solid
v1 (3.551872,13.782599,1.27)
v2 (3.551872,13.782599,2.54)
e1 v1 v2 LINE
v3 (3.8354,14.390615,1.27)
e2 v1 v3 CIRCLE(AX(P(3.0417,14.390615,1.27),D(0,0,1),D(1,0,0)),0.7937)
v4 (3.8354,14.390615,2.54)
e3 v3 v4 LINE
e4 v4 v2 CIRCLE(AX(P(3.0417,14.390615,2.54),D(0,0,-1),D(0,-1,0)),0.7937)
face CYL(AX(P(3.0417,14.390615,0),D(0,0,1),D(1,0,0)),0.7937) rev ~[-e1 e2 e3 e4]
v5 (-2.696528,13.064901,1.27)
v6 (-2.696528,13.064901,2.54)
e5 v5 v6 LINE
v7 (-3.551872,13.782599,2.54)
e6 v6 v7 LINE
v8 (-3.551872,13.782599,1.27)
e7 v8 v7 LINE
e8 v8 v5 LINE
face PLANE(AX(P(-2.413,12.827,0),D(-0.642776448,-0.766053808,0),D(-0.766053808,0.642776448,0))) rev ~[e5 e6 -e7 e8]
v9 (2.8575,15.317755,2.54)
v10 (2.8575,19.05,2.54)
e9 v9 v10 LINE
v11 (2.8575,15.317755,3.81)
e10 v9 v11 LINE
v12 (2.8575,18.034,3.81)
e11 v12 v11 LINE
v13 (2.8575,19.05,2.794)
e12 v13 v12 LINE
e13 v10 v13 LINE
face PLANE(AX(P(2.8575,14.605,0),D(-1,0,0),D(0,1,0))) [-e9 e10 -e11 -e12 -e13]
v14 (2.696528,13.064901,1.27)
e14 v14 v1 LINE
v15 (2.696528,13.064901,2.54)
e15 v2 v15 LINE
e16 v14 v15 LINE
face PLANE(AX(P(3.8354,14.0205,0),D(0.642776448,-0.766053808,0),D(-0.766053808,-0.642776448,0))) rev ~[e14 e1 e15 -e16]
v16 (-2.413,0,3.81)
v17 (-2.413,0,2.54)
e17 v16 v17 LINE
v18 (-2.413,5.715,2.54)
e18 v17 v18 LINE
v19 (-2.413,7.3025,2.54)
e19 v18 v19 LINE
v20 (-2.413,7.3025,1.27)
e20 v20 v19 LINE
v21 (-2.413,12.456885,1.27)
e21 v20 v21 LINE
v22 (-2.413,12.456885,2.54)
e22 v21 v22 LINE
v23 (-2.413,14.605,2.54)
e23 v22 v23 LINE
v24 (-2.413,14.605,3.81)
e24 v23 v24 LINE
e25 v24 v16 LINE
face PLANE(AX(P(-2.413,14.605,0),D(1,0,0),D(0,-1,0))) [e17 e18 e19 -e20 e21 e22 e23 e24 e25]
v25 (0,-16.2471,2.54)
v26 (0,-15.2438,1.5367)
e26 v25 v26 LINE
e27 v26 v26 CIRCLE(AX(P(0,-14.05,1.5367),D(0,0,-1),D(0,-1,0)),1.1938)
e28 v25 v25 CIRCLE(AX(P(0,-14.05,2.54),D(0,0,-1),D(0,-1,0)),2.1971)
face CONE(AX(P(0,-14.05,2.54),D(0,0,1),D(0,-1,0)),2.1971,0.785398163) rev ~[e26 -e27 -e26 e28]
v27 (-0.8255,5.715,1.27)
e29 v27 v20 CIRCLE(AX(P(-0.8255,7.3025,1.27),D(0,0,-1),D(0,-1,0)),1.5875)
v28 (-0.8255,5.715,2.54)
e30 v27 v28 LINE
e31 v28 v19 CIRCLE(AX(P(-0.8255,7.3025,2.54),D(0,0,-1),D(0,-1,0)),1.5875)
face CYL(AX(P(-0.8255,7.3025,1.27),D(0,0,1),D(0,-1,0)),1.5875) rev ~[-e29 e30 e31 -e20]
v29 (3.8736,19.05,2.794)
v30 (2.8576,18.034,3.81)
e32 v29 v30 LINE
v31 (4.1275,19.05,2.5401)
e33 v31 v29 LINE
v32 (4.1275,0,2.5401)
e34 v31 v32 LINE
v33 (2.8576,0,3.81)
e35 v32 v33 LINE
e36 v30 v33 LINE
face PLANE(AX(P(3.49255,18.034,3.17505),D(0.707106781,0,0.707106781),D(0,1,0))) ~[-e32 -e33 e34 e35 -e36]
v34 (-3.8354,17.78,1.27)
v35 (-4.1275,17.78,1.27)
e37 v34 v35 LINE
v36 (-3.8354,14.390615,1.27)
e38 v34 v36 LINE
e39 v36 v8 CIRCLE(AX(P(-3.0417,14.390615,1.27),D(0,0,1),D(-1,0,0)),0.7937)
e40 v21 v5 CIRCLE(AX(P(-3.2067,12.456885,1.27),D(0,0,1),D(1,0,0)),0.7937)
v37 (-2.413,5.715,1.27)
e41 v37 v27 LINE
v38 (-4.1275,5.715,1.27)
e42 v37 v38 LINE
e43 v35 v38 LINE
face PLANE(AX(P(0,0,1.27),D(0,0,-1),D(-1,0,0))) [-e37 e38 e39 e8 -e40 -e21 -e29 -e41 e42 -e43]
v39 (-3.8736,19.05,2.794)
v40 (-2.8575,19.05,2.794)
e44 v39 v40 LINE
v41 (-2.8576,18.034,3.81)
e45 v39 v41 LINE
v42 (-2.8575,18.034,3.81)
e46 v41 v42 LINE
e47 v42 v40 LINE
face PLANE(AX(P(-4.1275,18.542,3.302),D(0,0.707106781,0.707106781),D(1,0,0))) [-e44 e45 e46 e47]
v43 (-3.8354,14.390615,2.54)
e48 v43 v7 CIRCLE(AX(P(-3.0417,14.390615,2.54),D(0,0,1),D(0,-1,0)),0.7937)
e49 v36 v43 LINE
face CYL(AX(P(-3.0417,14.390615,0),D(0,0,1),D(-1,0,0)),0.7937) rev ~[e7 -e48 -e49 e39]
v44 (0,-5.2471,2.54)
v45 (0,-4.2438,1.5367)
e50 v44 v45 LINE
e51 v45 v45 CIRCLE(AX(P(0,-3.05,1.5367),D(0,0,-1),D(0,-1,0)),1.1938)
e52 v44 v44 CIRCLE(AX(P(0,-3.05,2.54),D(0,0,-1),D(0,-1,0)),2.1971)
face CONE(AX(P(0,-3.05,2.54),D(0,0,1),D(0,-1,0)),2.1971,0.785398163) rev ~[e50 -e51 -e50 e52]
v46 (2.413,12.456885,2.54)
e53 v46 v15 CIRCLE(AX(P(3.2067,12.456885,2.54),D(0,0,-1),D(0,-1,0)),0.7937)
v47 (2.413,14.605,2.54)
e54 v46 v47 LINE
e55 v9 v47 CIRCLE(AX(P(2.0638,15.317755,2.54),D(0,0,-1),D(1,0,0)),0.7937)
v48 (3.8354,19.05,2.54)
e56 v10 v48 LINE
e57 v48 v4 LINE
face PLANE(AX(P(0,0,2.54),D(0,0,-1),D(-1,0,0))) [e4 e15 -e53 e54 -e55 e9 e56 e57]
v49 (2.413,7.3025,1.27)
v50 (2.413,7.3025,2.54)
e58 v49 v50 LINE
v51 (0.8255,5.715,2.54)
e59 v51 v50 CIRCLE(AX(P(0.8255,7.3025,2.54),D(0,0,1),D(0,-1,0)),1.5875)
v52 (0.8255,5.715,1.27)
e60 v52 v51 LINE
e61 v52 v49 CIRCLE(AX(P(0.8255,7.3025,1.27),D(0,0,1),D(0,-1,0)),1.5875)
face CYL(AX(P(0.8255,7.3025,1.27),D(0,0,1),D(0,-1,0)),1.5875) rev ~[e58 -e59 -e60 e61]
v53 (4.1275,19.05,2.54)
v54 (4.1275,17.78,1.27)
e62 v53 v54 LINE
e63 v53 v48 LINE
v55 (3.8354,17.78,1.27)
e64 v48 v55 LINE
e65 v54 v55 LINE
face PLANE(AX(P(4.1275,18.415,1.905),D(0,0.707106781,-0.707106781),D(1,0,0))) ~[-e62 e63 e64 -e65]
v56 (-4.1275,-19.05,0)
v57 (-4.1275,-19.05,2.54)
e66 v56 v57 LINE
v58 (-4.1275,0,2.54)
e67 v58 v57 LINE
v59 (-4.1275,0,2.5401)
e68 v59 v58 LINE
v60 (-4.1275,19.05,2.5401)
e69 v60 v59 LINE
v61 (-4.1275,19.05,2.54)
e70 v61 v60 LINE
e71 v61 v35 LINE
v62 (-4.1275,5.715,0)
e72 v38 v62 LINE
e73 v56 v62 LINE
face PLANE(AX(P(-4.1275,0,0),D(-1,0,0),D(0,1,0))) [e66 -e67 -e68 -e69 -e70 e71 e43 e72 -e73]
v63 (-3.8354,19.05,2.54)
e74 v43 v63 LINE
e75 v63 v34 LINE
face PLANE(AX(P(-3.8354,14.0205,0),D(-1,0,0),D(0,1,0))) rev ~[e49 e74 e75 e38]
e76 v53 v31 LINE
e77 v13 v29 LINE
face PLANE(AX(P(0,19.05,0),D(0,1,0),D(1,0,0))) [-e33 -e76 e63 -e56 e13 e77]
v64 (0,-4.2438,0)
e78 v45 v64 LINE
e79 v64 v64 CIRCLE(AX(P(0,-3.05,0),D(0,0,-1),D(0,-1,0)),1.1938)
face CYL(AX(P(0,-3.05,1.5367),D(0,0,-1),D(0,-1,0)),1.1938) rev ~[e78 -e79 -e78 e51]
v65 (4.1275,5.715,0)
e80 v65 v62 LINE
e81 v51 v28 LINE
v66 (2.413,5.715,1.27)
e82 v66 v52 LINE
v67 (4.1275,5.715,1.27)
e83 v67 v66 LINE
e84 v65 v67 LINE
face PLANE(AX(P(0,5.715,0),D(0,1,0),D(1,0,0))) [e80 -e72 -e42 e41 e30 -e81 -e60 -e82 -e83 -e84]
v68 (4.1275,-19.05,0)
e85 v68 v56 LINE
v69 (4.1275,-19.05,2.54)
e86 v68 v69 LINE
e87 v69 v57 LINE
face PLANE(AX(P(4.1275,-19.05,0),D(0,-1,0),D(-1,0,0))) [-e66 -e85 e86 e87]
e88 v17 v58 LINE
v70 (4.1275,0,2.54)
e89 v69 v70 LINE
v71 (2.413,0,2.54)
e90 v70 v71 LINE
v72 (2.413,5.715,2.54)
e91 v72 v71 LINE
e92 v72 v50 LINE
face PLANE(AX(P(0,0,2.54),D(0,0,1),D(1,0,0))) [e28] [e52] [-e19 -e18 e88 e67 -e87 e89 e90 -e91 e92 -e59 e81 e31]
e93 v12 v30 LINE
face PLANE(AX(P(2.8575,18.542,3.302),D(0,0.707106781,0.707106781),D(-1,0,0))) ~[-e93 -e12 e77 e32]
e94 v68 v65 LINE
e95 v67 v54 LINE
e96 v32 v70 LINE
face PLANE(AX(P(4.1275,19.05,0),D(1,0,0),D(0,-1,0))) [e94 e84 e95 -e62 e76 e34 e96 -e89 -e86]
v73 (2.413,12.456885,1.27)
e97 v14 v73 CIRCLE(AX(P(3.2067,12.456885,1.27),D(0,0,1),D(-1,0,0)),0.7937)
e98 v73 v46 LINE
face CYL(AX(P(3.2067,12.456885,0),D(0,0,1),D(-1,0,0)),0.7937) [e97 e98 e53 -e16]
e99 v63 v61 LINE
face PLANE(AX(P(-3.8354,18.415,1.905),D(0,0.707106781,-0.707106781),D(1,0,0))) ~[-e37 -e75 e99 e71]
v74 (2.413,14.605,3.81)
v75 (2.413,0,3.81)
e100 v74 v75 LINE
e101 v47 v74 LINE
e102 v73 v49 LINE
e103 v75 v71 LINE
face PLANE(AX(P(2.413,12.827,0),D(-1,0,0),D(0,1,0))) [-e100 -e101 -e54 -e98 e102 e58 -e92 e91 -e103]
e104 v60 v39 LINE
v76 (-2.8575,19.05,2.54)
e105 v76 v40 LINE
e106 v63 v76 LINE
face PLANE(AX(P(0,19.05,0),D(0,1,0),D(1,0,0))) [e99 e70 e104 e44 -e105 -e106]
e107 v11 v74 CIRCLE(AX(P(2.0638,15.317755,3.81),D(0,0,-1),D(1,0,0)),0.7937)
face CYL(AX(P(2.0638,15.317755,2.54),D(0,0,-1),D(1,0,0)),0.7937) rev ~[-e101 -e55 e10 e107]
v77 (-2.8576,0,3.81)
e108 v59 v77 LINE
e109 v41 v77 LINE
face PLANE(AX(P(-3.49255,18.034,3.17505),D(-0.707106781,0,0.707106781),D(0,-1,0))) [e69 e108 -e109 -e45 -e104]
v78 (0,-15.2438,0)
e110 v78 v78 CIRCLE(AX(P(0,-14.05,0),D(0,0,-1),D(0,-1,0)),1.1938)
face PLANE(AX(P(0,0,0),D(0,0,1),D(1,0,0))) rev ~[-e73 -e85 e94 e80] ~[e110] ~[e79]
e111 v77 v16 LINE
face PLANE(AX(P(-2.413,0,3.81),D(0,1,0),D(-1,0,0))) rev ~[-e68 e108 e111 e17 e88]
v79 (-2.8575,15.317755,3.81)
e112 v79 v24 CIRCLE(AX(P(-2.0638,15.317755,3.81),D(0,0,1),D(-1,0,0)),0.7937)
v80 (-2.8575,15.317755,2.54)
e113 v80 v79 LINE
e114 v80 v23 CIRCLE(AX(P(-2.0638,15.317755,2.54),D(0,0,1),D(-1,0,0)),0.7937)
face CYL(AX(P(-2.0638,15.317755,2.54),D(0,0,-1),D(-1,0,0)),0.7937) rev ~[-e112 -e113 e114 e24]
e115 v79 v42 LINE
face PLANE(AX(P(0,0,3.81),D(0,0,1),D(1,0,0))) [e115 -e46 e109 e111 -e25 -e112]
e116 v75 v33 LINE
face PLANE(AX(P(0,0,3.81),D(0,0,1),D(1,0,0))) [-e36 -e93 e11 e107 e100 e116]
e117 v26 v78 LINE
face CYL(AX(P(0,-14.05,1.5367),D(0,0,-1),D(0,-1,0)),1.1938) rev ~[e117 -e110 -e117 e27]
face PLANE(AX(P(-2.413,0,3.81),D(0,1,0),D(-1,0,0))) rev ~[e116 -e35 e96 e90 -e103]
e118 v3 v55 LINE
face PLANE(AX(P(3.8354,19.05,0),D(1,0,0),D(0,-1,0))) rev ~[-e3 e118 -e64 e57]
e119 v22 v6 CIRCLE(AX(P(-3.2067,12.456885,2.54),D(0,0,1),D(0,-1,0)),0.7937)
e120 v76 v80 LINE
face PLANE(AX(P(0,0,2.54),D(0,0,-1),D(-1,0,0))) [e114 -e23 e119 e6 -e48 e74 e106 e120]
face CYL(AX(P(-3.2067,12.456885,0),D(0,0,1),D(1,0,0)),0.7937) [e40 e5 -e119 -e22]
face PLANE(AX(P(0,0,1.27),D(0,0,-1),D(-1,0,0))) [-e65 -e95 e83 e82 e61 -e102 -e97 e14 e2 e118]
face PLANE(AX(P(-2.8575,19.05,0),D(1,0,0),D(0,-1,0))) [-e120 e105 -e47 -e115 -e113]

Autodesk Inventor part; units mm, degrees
ref_plane "YZ Plane" through (0, 0, 0) normal (1, 0, 0) x (0, 1, 0)
ref_plane "XZ Plane" through (0, 0, 0) normal (0, 1, 0) x (-1, 0, 0)
ref_plane "XY Plane" through (0, 0, 0) normal (0, 0, 1) x (1, 0, 0)
sketch "Sketch1" plane through (0, 0, 0) normal (0, 0, 1) x (1, 0, 0)
  line L0 (0, 26.67) -> (0, -26.67) projected
  line L1 (-5.7785, 0) -> (5.7785, 0) projected
  line L2 (4.1275, -19.05) -> (-4.1275, -19.05)
  line L3 (-4.1275, -19.05) -> (-4.1275, 19.05)
  line L4 (-4.1275, 19.05) -> (4.1275, 19.05)
  line L5 (4.1275, 19.05) -> (4.1275, -19.05)
  line L6 (4.1275, -19.05) -> (-4.1275, 19.05) construction
  line L7 (-4.1275, -19.05) -> (4.1275, 19.05) construction
  point P0 (0, 0)
  point P1 (0, -14.05)
  point P2 (0, -3.05)
  dimension "d0" = 38.1
  dimension "d1" = 8.255
  dimension "d2" = 5
  dimension "d3" = 11
extrude "Extrusion1" add sketch "Sketch1" along normal blind 3.81
sketch "Sketch5" plane through (0, 0, 3.81) normal (0, 0, 1) x (1, 0, 0)
  point P0 (0, 0)
  point P1 (0, -3.05)
  point P2 (0, -14.05)
hole "Hole2" at (0, -3.05, 3.81) at (0, -14.05, 3.81) direction (0, 0, -1) diameter 1.27 end through all
sketch "Sketch2" plane through (0, 0, 0) normal (0, 0, -1) x (-1, 0, 0)
  line L0 (4.1275, 19.05) -> (-4.1275, 19.05) projected
  line L1 (-3.8354, 19.05) -> (-3.8354, 14.0205)
  line L2 (-3.8354, 14.0205) -> (-2.413, 12.827)
  line L3 (-2.413, 12.827) -> (2.413, 12.827)
  line L4 (2.413, 12.827) -> (3.8354, 14.0205)
  line L5 (3.8354, 14.0205) -> (3.8354, 19.05)
  line L6 (0, -26.67) -> (0, 26.67) projected
  line L7 (-6.6675, 0) -> (6.6675, 0) projected
  point P0 (0, 0)
  dimension "d13" = 7.6708
  dimension "d14" = 6.223
  dimension "d15" = 4.826
  dimension "d16" = 3.8354
  dimension "d17" = 2.413
  dimension "d18" = 140
extrude "Extrusion2" cut sketch "Sketch2" against normal blind 2.54
sketch "Sketch3" plane through (0, 0, 0) normal (0, 0, -1) x (-1, 0, 0)
  line L0 (-3.8354, 19.05) -> (3.8354, 19.05) projected
  line L1 (-3.8354, 14.0205) -> (-3.8354, 19.05) projected
  line L2 (-2.413, 12.827) -> (-3.8354, 14.0205) projected
  line L3 (2.413, 12.827) -> (-2.413, 12.827) projected
  line L4 (3.8354, 14.0205) -> (2.413, 12.827) projected
  line L5 (3.8354, 19.05) -> (3.8354, 14.0205) projected
  line L6 (0, -26.67) -> (0, 26.67) projected
  line L7 (2.8575, 14.605) -> (-2.8575, 14.605)
  line L8 (-2.8575, 14.605) -> (-2.8575, 19.05)
  line L9 (-2.8575, 19.05) -> (2.8575, 19.05)
  line L10 (2.8575, 19.05) -> (2.8575, 14.605)
  line L11 (2.8575, 14.605) -> (-2.8575, 19.05) construction
  line L12 (-2.8575, 14.605) -> (2.8575, 19.05) construction
  line L13 (2.413, 5.715) -> (-2.413, 5.715)
  line L14 (-2.413, 5.715) -> (-2.413, 14.605)
  line L15 (-2.413, 14.605) -> (2.413, 14.605)
  line L16 (2.413, 14.605) -> (2.413, 5.715)
  line L17 (2.413, 5.715) -> (-2.413, 14.605) construction
  line L18 (-2.413, 5.715) -> (2.413, 14.605) construction
  point P0 (0, 0)
  point P1 (0, 16.8275)
  point P2 (0, 10.16)
  dimension "d21" = 5.715
  dimension "d22" = 4.826
  dimension "d23" = 8.89
  dimension "d24" = 4.445
extrude "Extrusion3" cut sketch "Sketch3" against normal through all contours L0 L6 L7 L8 | L0 L10 L7 L6 | L14 L7 L6 L3 | L3 L6 L13 L14 | L7 L16 L3 L6 | L3 L16 L13 L6
fillet "Fillet1" radius 0.7937 4 edges at (3.8354, 14.0205, 1.27) (2.413, 12.827, 1.27) (-2.413, 12.827, 1.27) (-3.8354, 14.0205, 1.27)
fillet "Fillet2" radius 0.7937 2 edges at (-2.8575, 14.605, 3.175) (2.8575, 14.605, 3.175)
sketch "Sketch6" plane through (0, 0, 0) normal (0, 0, -1) x (-1, 0, 0)
  line L0 (0, -26.67) -> (0, 26.67) projected
  line L1 (-8.89, 0) -> (8.89, 0) projected
  line L2 (6.35, 5.715) -> (-6.35, 5.715)
  line L3 (-6.35, 5.715) -> (-6.35, 19.05)
  line L4 (-6.35, 19.05) -> (6.35, 19.05)
  line L5 (6.35, 19.05) -> (6.35, 5.715)
  line L6 (6.35, 5.715) -> (-6.35, 19.05) construction
  line L7 (-6.35, 5.715) -> (6.35, 19.05) construction
  line L8 (-3.8354, 19.05) -> (-4.1275, 19.05) projected
  point P0 (0, 0)
  point P1 (0, 12.3825)
  dimension "d50" = 12.7
  dimension "d51" = 5.715
  dimension "d52" = 0
extrude "Extrusion5" cut sketch "Sketch6" against normal blind 1.27
chamfer "Chamfer1" distance 1.27 angle 45 2 edges at (3.9815, 19.05, 1.27) (-3.9814, 19.05, 1.27)
chamfer "Chamfer2" distance 1.016 angle 45 2 edges at (3.4925, 19.05, 3.81) (-3.4925, 19.05, 3.81)
sketch "Sketch7" plane through (0, 0, 3.81) normal (0, 0, 1) x (1, 0, 0)
  line L0 (-4.1275, 18.034) -> (-2.8575, 18.034) projected
  line L1 (-4.1275, 18.034) -> (-4.1275, -19.05) projected
  line L2 (-4.1275, -19.05) -> (4.1275, -19.05) projected
  line L3 (4.1275, -19.05) -> (4.1275, 18.034) projected
  line L4 (2.8575, 18.034) -> (4.1275, 18.034) projected
  line L5 (2.8575, 18.034) -> (2.8575, 15.3178) projected
  arc A0 (2.413, 14.605) -> (2.8575, 15.3178) centre (2.0638, 15.3178) ccw projected
  line L6 (2.413, 14.605) -> (2.413, 5.715) projected
  line L7 (2.413, 5.715) -> (-2.413, 5.715) projected
  line L8 (-2.413, 5.715) -> (-2.413, 14.605) projected
  arc A1 (-2.8575, 15.3178) -> (-2.413, 14.605) centre (-2.0637, 15.3178) ccw projected
  line L9 (-2.8575, 15.3178) -> (-2.8575, 18.034) projected
  circle A2 centre (0, -3.05) radius 0.635 projected
  circle A3 centre (0, -14.05) radius 0.635 projected
  line L10 (-4.1275, -19.05) -> (4.1275, -19.05)
  line L11 (4.1275, -19.05) -> (4.1275, 0)
  line L12 (4.1275, 0) -> (-4.1275, 0)
  line L13 (-4.1275, 0) -> (-4.1275, -19.05)
  line L14 (-6.6675, 0) -> (6.6675, 0) projected
  line L15 (0, 26.67) -> (0, -26.67) projected
  line L16 (2.413, 0) -> (-2.413, 0)
  line L17 (-2.413, 0) -> (-2.413, 5.715)
  line L18 (-2.413, 5.715) -> (2.413, 5.715)
  line L19 (2.413, 5.715) -> (2.413, 0)
  line L20 (2.413, 0) -> (-2.413, 5.715) construction
  line L21 (-2.413, 0) -> (2.413, 5.715) construction
  point P0 (0, 0)
  point P1 (0, 2.8575)
  dimension "d55" = 0
  dimension "d58" = 0
extrude "Extrusion6" cut sketch "Sketch7" against normal blind 1.27 contours L12 L15 A2 A3 L2 L1 | L15 A3 A2 L12 L3 L2
hole "Hole3" at (0, -3.05, 2.54) direction (0, 0, -1) diameter 2.3876 end through all countersink diameter 4.3942 countersink angle 90 clearance for "Flat Head Machine Screw" size "M2" standard "Ansi Metric M Profile"
hole "Hole4" at (0, -14.05, 2.54) direction (0, 0, -1) diameter 2.3876 end through all countersink diameter 4.3942 countersink angle 90 clearance for "Flat Head Machine Screw" size "M2" standard "Ansi Metric M Profile"
extrude "Extrusion7" cut sketch "Sketch7" against normal up to surface (1.27 mm away) contours L17 L7 L15 L12 | L15 L7 L19 L12
fillet "Fillet3" radius 1.5875 2 edges at (2.413, 5.715, 1.905) (-2.413, 5.715, 1.905)
chamfer "Chamfer4" distance 1.27 angle 45 2 edges at (-4.1275, 9.017, 3.81) (4.1275, 9.017, 3.81)
equation "\"d16\" = 0.5 * d13"
equation "\"d17\" = 0.5 * d15"
properties part number "J007803" material "VERO BLACK"
